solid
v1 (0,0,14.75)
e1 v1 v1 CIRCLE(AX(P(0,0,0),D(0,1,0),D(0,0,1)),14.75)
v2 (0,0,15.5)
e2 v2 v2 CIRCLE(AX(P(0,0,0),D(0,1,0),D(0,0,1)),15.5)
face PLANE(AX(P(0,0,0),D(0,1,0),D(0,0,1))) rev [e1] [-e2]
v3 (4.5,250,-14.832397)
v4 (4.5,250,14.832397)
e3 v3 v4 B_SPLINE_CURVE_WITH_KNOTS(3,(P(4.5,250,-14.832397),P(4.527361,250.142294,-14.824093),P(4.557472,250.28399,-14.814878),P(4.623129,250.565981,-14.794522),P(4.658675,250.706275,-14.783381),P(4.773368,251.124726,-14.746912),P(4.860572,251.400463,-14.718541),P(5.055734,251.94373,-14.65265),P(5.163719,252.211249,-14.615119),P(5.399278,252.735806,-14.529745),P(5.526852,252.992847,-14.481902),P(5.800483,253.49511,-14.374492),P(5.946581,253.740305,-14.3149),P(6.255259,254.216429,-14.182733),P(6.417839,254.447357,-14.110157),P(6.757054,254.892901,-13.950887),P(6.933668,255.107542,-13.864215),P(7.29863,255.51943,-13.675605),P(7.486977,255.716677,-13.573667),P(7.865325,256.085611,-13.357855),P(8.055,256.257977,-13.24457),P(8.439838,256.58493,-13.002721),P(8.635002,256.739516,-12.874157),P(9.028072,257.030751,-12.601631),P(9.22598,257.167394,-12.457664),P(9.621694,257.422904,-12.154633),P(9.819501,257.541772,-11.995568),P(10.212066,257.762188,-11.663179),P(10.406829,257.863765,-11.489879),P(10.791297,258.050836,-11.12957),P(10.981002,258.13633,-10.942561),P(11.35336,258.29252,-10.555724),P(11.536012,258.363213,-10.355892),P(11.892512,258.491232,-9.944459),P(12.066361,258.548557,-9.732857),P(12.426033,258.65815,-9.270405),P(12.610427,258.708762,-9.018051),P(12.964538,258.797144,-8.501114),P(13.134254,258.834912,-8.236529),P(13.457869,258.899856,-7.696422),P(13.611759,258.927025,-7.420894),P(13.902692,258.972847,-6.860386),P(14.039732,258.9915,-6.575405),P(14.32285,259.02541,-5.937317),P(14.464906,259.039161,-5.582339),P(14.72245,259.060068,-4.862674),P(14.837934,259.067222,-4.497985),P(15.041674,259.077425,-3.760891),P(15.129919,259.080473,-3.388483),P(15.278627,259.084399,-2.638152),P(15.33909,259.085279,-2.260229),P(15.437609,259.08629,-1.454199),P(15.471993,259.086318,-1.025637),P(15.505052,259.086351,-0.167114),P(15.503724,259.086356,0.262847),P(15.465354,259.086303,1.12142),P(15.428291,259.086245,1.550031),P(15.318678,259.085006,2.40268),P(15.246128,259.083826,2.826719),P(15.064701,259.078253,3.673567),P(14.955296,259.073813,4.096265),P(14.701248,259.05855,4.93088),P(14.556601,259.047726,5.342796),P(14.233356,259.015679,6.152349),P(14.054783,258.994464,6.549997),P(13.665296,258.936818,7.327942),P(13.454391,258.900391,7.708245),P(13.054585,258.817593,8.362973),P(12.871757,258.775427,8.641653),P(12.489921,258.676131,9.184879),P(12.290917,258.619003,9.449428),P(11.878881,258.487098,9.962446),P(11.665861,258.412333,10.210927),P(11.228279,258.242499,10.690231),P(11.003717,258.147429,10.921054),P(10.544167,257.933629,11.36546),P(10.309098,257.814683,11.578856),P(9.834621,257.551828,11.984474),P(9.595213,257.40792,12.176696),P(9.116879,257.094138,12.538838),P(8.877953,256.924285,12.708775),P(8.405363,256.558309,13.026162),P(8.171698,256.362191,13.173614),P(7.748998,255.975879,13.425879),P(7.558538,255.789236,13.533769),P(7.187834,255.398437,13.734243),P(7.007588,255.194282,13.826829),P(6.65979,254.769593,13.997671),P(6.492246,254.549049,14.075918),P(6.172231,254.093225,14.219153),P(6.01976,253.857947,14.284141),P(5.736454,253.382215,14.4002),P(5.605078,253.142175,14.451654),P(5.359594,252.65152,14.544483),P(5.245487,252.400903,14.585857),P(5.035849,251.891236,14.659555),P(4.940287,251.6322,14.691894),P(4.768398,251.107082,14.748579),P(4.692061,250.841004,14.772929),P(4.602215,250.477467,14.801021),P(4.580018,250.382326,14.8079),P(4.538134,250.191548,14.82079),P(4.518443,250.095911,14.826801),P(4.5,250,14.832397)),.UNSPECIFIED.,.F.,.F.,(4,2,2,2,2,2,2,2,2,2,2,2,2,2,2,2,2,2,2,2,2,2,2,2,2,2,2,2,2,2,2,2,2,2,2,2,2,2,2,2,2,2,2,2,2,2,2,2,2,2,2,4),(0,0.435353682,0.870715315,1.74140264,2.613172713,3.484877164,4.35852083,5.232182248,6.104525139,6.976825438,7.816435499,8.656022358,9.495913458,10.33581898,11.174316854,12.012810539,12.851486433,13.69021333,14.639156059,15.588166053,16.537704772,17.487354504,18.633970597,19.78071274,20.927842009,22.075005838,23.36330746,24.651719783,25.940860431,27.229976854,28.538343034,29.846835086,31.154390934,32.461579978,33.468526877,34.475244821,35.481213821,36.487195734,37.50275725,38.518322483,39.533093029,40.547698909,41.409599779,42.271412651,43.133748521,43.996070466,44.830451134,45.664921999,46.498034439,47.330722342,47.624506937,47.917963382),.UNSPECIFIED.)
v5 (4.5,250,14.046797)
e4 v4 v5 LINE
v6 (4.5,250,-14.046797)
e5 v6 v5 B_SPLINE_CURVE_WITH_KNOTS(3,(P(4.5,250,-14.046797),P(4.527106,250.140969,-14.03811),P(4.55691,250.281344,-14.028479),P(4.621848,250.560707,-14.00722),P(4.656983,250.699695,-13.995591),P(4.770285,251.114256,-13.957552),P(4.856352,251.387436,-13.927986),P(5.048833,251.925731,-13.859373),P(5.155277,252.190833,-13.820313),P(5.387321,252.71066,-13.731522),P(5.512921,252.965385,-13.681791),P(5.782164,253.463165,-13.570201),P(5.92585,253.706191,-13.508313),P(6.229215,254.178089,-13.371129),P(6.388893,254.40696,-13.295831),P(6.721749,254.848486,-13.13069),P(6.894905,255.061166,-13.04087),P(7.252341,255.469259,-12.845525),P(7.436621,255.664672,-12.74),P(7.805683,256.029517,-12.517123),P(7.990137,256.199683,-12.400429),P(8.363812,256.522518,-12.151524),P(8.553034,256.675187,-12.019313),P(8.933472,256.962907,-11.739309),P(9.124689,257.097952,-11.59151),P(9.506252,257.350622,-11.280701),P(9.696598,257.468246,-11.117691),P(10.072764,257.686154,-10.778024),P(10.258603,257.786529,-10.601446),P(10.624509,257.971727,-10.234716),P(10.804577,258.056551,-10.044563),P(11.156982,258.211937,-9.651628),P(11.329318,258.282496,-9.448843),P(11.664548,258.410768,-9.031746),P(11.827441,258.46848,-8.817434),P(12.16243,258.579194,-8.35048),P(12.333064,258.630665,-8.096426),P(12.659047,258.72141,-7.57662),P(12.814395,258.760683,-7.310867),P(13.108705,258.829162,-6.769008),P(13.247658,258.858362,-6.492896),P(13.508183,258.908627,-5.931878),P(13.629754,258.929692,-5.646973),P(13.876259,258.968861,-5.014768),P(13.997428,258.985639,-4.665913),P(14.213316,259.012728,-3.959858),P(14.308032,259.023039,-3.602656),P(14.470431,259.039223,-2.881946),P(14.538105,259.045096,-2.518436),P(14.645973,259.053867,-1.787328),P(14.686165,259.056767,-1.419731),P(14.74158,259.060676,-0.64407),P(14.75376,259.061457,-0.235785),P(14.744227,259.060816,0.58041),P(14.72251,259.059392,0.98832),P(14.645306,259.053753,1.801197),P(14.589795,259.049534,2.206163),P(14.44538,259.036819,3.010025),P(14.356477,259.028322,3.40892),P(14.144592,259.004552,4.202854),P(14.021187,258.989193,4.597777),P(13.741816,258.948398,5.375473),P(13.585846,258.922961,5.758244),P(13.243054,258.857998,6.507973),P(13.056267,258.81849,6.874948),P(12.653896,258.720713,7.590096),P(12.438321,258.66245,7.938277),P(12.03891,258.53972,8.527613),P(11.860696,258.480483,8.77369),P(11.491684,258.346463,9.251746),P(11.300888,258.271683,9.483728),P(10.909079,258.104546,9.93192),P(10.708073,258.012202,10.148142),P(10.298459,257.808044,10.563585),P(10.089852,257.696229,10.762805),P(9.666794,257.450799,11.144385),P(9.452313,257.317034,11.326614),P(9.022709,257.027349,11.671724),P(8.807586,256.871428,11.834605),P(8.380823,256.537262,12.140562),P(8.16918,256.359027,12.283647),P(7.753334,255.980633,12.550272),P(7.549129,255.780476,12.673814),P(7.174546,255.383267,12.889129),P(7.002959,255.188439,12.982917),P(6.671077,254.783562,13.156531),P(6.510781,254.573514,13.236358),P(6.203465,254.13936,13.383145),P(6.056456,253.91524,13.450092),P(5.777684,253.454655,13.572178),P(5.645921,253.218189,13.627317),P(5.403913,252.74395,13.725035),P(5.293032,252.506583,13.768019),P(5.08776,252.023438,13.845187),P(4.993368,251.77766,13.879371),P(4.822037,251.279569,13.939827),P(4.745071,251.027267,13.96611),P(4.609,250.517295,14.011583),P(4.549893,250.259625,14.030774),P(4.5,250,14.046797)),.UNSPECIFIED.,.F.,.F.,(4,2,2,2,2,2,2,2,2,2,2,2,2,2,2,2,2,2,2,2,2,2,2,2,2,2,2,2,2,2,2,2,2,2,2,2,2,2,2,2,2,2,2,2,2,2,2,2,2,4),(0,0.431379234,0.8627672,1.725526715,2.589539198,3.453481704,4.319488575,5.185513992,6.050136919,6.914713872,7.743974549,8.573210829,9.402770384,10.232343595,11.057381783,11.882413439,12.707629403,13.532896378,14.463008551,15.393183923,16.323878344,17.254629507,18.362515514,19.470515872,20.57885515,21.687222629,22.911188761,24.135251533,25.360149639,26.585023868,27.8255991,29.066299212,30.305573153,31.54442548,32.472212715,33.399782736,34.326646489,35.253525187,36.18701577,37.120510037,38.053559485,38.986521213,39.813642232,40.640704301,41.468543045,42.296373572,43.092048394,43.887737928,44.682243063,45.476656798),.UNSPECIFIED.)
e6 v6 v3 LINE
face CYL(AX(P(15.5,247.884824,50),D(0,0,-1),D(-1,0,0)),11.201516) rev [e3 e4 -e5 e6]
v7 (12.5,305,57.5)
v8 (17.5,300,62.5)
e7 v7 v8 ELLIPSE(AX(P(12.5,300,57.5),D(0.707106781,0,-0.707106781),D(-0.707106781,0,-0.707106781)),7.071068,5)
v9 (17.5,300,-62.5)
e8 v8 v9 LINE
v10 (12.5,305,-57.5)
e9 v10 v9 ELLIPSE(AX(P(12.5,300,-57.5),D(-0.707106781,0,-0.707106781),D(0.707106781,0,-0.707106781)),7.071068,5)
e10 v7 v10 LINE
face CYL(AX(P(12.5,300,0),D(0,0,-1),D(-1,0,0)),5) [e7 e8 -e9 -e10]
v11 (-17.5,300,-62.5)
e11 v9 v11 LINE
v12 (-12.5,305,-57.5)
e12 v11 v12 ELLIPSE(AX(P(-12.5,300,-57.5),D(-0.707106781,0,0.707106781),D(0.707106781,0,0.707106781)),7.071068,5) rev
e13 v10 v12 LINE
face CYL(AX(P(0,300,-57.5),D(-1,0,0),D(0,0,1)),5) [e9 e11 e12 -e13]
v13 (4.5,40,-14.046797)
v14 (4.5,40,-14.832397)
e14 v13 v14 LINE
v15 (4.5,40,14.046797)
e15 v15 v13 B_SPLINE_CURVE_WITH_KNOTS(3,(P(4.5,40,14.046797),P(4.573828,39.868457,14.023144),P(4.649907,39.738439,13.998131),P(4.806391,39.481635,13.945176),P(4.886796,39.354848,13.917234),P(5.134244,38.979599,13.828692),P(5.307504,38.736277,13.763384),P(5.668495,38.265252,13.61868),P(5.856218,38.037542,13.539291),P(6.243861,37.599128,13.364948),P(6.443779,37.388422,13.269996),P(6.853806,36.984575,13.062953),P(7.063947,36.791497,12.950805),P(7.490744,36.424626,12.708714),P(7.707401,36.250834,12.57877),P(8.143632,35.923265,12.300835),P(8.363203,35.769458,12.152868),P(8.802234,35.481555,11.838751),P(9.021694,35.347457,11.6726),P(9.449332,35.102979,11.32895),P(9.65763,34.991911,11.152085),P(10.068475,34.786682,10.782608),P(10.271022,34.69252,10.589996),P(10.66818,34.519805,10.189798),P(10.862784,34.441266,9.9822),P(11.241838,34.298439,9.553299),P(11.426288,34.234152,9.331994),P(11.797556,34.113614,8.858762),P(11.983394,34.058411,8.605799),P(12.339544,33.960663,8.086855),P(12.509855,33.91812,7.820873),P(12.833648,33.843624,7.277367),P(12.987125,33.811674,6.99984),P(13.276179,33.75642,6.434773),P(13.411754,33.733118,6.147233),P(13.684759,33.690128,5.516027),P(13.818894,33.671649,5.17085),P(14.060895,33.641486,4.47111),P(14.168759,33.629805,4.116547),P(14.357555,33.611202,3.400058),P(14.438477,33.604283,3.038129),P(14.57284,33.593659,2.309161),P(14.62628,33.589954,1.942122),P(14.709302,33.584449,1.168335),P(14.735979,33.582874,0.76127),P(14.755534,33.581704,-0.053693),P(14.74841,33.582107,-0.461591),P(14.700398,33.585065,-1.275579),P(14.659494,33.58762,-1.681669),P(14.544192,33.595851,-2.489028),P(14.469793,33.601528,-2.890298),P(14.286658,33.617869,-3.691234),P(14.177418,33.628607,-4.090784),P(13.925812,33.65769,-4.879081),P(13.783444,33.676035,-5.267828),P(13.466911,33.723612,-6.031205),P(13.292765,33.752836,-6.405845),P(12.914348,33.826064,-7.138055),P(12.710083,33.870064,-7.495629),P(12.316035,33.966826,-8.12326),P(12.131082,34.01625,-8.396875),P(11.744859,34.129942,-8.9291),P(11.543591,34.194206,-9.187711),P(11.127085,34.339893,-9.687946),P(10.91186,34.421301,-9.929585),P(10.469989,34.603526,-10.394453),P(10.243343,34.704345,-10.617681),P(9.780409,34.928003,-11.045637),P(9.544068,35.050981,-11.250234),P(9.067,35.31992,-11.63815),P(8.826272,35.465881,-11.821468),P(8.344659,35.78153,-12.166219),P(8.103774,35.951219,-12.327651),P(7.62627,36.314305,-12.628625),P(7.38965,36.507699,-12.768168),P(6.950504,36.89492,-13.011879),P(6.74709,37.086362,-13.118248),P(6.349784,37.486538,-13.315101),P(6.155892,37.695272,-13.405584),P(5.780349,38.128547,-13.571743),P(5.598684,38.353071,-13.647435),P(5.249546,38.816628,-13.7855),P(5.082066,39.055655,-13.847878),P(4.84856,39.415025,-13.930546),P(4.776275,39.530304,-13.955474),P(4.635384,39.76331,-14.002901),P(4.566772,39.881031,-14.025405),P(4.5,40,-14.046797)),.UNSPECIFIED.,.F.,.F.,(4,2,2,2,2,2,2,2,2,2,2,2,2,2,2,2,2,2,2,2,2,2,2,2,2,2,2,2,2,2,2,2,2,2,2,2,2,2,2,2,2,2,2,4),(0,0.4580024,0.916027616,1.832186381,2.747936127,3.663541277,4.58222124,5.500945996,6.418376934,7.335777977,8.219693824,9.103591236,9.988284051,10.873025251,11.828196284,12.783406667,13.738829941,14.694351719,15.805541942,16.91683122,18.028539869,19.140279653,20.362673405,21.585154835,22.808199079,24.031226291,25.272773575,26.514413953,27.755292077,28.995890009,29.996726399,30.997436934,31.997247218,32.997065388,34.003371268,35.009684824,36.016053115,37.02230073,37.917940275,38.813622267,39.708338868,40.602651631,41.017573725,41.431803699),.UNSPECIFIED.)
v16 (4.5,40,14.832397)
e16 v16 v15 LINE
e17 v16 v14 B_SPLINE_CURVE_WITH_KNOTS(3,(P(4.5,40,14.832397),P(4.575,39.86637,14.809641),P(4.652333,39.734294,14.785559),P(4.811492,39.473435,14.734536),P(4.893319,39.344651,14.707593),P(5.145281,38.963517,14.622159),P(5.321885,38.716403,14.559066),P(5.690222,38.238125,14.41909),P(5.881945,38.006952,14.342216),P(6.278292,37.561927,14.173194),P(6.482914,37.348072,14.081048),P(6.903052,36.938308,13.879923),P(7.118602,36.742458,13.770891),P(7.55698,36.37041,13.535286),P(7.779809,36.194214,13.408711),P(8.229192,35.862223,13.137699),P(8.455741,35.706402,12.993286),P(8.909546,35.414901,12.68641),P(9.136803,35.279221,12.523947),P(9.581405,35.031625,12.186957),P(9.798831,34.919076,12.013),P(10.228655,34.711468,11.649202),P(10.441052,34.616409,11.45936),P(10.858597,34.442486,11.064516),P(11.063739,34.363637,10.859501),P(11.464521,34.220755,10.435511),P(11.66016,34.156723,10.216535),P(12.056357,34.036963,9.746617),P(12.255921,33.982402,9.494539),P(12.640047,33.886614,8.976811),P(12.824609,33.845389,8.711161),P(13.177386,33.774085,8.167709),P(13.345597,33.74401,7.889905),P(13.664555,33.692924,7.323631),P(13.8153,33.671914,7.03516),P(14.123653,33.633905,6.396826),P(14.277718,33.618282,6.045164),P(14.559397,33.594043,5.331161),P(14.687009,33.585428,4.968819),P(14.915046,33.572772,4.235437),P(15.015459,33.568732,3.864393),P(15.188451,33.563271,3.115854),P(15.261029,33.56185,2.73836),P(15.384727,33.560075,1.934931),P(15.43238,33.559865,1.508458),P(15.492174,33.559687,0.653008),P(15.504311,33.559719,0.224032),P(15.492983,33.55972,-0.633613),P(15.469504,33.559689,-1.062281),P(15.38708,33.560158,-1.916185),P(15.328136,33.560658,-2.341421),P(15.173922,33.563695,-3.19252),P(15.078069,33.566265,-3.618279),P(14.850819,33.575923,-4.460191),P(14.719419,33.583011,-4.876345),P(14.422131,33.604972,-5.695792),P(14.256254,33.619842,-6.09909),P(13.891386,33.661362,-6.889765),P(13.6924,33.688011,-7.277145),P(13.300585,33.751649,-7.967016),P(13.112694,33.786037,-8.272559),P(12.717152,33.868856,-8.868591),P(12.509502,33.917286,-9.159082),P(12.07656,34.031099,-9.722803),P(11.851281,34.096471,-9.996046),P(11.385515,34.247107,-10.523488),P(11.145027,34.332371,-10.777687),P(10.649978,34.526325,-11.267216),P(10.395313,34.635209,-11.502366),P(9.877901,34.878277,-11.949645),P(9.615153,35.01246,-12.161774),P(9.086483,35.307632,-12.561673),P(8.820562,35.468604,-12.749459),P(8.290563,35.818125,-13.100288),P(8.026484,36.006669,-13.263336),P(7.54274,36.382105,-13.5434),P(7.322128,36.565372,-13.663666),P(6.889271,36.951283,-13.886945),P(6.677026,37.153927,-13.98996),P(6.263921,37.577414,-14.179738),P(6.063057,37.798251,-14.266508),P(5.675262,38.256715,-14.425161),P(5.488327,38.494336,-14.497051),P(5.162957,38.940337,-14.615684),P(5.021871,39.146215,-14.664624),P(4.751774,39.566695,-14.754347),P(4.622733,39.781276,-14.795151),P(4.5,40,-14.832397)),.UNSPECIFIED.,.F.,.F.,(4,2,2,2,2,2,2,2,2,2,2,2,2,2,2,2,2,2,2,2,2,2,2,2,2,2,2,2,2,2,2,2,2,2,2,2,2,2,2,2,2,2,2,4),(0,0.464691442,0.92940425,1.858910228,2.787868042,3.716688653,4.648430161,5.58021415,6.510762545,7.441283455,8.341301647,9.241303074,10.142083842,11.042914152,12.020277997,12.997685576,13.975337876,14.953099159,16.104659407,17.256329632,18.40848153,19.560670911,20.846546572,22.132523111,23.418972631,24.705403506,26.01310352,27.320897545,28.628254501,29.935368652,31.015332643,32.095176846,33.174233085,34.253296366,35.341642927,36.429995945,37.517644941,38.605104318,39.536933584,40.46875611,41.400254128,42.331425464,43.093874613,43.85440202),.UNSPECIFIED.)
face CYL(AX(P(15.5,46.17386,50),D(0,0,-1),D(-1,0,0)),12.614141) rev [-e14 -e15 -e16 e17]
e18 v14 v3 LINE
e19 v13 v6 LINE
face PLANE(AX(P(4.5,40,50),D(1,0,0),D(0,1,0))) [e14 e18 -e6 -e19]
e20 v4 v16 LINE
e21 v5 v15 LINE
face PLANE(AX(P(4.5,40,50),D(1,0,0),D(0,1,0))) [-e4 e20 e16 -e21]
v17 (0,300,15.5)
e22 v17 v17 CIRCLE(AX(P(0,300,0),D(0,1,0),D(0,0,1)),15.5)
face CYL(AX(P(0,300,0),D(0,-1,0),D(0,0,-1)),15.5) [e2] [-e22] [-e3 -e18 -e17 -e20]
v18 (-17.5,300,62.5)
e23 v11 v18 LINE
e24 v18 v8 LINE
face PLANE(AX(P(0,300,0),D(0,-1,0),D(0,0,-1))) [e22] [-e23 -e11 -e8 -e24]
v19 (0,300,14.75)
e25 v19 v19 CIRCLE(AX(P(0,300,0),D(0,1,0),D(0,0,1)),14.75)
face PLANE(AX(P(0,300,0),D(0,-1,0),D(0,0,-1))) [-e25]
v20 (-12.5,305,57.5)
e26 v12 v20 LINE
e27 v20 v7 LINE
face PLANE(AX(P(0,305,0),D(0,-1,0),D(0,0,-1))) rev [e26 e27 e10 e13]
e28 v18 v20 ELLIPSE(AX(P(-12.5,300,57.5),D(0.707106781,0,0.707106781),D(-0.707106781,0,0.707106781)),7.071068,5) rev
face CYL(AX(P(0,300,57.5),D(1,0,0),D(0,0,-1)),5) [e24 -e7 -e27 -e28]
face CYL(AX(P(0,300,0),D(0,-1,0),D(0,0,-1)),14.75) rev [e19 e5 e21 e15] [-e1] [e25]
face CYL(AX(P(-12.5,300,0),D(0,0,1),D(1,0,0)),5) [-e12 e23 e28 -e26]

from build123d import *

# Parameters (mm, degrees)
SKETCH1_R               = 15.5
SKETCH1_R_2             = 14.75
BOSS_EXTRUDE1_DEPTH     = 300
SKETCH4_W               = 35
SKETCH4_H               = 125
BOSS_EXTRUDE2_DEPTH     = 5
CUT_EXTRUDE2_DEPTH      = 50
CUT_EXTRUDE2_DEPTH_BACK = 40
FILLET2_R               = 5


with BuildPart() as part:
    # Sketch1 → Boss-Extrude1 (new body)
    with BuildSketch(Plane(origin=(0, 0, 0), x_dir=(1, 0, 0), z_dir=(0, 1, 0))):
        with Locations(Location((0, 0, 0), (0, 0, 270))):
            Circle(SKETCH1_R)
        with Locations(Location((0, 0, 0), (0, 0, 270))):
            Circle(SKETCH1_R_2, mode=Mode.SUBTRACT)
    extrude(amount=BOSS_EXTRUDE1_DEPTH)

    # Sketch4 → Boss-Extrude2 (add)
    with BuildSketch(Plane(origin=(0, 300, 0), x_dir=(1, 0, 0), z_dir=(0, 1, 0))):
        Rectangle(SKETCH4_W, SKETCH4_H)
    extrude(amount=BOSS_EXTRUDE2_DEPTH)

    # Sketch2 → Cut-Extrude2 (cut, two sides: drawn at the far end of the back side and taken through both)
    with BuildSketch(Plane.XY.offset(-CUT_EXTRUDE2_DEPTH_BACK)):
        with BuildLine():
            Line((15.5, 33.559719433), (15.5, 259.086340433))
            ThreePointArc((15.5, 259.086340433), (8.366249541, 256.521002237), (4.5, 250))
            Line((4.5, 250), (4.5, 40))
            ThreePointArc((4.5, 40), (9.126672498, 35.288216236), (15.5, 33.559719433))
        make_face()
    extrude(amount=CUT_EXTRUDE2_DEPTH + CUT_EXTRUDE2_DEPTH_BACK, mode=Mode.SUBTRACT)

    # Fillet2
    fillet2_edges = [part.edges().sort_by_distance(p)[0] for p in [
        (0, 305, -62.5),
        (0, 305, 62.5),
        (-17.5, 305, 0),
        (17.5, 305, 0),
    ]]
    fillet(fillet2_edges, radius=FILLET2_R - 0.0001)  # a hair under: the kernel refuses the full size


solid = part.part
